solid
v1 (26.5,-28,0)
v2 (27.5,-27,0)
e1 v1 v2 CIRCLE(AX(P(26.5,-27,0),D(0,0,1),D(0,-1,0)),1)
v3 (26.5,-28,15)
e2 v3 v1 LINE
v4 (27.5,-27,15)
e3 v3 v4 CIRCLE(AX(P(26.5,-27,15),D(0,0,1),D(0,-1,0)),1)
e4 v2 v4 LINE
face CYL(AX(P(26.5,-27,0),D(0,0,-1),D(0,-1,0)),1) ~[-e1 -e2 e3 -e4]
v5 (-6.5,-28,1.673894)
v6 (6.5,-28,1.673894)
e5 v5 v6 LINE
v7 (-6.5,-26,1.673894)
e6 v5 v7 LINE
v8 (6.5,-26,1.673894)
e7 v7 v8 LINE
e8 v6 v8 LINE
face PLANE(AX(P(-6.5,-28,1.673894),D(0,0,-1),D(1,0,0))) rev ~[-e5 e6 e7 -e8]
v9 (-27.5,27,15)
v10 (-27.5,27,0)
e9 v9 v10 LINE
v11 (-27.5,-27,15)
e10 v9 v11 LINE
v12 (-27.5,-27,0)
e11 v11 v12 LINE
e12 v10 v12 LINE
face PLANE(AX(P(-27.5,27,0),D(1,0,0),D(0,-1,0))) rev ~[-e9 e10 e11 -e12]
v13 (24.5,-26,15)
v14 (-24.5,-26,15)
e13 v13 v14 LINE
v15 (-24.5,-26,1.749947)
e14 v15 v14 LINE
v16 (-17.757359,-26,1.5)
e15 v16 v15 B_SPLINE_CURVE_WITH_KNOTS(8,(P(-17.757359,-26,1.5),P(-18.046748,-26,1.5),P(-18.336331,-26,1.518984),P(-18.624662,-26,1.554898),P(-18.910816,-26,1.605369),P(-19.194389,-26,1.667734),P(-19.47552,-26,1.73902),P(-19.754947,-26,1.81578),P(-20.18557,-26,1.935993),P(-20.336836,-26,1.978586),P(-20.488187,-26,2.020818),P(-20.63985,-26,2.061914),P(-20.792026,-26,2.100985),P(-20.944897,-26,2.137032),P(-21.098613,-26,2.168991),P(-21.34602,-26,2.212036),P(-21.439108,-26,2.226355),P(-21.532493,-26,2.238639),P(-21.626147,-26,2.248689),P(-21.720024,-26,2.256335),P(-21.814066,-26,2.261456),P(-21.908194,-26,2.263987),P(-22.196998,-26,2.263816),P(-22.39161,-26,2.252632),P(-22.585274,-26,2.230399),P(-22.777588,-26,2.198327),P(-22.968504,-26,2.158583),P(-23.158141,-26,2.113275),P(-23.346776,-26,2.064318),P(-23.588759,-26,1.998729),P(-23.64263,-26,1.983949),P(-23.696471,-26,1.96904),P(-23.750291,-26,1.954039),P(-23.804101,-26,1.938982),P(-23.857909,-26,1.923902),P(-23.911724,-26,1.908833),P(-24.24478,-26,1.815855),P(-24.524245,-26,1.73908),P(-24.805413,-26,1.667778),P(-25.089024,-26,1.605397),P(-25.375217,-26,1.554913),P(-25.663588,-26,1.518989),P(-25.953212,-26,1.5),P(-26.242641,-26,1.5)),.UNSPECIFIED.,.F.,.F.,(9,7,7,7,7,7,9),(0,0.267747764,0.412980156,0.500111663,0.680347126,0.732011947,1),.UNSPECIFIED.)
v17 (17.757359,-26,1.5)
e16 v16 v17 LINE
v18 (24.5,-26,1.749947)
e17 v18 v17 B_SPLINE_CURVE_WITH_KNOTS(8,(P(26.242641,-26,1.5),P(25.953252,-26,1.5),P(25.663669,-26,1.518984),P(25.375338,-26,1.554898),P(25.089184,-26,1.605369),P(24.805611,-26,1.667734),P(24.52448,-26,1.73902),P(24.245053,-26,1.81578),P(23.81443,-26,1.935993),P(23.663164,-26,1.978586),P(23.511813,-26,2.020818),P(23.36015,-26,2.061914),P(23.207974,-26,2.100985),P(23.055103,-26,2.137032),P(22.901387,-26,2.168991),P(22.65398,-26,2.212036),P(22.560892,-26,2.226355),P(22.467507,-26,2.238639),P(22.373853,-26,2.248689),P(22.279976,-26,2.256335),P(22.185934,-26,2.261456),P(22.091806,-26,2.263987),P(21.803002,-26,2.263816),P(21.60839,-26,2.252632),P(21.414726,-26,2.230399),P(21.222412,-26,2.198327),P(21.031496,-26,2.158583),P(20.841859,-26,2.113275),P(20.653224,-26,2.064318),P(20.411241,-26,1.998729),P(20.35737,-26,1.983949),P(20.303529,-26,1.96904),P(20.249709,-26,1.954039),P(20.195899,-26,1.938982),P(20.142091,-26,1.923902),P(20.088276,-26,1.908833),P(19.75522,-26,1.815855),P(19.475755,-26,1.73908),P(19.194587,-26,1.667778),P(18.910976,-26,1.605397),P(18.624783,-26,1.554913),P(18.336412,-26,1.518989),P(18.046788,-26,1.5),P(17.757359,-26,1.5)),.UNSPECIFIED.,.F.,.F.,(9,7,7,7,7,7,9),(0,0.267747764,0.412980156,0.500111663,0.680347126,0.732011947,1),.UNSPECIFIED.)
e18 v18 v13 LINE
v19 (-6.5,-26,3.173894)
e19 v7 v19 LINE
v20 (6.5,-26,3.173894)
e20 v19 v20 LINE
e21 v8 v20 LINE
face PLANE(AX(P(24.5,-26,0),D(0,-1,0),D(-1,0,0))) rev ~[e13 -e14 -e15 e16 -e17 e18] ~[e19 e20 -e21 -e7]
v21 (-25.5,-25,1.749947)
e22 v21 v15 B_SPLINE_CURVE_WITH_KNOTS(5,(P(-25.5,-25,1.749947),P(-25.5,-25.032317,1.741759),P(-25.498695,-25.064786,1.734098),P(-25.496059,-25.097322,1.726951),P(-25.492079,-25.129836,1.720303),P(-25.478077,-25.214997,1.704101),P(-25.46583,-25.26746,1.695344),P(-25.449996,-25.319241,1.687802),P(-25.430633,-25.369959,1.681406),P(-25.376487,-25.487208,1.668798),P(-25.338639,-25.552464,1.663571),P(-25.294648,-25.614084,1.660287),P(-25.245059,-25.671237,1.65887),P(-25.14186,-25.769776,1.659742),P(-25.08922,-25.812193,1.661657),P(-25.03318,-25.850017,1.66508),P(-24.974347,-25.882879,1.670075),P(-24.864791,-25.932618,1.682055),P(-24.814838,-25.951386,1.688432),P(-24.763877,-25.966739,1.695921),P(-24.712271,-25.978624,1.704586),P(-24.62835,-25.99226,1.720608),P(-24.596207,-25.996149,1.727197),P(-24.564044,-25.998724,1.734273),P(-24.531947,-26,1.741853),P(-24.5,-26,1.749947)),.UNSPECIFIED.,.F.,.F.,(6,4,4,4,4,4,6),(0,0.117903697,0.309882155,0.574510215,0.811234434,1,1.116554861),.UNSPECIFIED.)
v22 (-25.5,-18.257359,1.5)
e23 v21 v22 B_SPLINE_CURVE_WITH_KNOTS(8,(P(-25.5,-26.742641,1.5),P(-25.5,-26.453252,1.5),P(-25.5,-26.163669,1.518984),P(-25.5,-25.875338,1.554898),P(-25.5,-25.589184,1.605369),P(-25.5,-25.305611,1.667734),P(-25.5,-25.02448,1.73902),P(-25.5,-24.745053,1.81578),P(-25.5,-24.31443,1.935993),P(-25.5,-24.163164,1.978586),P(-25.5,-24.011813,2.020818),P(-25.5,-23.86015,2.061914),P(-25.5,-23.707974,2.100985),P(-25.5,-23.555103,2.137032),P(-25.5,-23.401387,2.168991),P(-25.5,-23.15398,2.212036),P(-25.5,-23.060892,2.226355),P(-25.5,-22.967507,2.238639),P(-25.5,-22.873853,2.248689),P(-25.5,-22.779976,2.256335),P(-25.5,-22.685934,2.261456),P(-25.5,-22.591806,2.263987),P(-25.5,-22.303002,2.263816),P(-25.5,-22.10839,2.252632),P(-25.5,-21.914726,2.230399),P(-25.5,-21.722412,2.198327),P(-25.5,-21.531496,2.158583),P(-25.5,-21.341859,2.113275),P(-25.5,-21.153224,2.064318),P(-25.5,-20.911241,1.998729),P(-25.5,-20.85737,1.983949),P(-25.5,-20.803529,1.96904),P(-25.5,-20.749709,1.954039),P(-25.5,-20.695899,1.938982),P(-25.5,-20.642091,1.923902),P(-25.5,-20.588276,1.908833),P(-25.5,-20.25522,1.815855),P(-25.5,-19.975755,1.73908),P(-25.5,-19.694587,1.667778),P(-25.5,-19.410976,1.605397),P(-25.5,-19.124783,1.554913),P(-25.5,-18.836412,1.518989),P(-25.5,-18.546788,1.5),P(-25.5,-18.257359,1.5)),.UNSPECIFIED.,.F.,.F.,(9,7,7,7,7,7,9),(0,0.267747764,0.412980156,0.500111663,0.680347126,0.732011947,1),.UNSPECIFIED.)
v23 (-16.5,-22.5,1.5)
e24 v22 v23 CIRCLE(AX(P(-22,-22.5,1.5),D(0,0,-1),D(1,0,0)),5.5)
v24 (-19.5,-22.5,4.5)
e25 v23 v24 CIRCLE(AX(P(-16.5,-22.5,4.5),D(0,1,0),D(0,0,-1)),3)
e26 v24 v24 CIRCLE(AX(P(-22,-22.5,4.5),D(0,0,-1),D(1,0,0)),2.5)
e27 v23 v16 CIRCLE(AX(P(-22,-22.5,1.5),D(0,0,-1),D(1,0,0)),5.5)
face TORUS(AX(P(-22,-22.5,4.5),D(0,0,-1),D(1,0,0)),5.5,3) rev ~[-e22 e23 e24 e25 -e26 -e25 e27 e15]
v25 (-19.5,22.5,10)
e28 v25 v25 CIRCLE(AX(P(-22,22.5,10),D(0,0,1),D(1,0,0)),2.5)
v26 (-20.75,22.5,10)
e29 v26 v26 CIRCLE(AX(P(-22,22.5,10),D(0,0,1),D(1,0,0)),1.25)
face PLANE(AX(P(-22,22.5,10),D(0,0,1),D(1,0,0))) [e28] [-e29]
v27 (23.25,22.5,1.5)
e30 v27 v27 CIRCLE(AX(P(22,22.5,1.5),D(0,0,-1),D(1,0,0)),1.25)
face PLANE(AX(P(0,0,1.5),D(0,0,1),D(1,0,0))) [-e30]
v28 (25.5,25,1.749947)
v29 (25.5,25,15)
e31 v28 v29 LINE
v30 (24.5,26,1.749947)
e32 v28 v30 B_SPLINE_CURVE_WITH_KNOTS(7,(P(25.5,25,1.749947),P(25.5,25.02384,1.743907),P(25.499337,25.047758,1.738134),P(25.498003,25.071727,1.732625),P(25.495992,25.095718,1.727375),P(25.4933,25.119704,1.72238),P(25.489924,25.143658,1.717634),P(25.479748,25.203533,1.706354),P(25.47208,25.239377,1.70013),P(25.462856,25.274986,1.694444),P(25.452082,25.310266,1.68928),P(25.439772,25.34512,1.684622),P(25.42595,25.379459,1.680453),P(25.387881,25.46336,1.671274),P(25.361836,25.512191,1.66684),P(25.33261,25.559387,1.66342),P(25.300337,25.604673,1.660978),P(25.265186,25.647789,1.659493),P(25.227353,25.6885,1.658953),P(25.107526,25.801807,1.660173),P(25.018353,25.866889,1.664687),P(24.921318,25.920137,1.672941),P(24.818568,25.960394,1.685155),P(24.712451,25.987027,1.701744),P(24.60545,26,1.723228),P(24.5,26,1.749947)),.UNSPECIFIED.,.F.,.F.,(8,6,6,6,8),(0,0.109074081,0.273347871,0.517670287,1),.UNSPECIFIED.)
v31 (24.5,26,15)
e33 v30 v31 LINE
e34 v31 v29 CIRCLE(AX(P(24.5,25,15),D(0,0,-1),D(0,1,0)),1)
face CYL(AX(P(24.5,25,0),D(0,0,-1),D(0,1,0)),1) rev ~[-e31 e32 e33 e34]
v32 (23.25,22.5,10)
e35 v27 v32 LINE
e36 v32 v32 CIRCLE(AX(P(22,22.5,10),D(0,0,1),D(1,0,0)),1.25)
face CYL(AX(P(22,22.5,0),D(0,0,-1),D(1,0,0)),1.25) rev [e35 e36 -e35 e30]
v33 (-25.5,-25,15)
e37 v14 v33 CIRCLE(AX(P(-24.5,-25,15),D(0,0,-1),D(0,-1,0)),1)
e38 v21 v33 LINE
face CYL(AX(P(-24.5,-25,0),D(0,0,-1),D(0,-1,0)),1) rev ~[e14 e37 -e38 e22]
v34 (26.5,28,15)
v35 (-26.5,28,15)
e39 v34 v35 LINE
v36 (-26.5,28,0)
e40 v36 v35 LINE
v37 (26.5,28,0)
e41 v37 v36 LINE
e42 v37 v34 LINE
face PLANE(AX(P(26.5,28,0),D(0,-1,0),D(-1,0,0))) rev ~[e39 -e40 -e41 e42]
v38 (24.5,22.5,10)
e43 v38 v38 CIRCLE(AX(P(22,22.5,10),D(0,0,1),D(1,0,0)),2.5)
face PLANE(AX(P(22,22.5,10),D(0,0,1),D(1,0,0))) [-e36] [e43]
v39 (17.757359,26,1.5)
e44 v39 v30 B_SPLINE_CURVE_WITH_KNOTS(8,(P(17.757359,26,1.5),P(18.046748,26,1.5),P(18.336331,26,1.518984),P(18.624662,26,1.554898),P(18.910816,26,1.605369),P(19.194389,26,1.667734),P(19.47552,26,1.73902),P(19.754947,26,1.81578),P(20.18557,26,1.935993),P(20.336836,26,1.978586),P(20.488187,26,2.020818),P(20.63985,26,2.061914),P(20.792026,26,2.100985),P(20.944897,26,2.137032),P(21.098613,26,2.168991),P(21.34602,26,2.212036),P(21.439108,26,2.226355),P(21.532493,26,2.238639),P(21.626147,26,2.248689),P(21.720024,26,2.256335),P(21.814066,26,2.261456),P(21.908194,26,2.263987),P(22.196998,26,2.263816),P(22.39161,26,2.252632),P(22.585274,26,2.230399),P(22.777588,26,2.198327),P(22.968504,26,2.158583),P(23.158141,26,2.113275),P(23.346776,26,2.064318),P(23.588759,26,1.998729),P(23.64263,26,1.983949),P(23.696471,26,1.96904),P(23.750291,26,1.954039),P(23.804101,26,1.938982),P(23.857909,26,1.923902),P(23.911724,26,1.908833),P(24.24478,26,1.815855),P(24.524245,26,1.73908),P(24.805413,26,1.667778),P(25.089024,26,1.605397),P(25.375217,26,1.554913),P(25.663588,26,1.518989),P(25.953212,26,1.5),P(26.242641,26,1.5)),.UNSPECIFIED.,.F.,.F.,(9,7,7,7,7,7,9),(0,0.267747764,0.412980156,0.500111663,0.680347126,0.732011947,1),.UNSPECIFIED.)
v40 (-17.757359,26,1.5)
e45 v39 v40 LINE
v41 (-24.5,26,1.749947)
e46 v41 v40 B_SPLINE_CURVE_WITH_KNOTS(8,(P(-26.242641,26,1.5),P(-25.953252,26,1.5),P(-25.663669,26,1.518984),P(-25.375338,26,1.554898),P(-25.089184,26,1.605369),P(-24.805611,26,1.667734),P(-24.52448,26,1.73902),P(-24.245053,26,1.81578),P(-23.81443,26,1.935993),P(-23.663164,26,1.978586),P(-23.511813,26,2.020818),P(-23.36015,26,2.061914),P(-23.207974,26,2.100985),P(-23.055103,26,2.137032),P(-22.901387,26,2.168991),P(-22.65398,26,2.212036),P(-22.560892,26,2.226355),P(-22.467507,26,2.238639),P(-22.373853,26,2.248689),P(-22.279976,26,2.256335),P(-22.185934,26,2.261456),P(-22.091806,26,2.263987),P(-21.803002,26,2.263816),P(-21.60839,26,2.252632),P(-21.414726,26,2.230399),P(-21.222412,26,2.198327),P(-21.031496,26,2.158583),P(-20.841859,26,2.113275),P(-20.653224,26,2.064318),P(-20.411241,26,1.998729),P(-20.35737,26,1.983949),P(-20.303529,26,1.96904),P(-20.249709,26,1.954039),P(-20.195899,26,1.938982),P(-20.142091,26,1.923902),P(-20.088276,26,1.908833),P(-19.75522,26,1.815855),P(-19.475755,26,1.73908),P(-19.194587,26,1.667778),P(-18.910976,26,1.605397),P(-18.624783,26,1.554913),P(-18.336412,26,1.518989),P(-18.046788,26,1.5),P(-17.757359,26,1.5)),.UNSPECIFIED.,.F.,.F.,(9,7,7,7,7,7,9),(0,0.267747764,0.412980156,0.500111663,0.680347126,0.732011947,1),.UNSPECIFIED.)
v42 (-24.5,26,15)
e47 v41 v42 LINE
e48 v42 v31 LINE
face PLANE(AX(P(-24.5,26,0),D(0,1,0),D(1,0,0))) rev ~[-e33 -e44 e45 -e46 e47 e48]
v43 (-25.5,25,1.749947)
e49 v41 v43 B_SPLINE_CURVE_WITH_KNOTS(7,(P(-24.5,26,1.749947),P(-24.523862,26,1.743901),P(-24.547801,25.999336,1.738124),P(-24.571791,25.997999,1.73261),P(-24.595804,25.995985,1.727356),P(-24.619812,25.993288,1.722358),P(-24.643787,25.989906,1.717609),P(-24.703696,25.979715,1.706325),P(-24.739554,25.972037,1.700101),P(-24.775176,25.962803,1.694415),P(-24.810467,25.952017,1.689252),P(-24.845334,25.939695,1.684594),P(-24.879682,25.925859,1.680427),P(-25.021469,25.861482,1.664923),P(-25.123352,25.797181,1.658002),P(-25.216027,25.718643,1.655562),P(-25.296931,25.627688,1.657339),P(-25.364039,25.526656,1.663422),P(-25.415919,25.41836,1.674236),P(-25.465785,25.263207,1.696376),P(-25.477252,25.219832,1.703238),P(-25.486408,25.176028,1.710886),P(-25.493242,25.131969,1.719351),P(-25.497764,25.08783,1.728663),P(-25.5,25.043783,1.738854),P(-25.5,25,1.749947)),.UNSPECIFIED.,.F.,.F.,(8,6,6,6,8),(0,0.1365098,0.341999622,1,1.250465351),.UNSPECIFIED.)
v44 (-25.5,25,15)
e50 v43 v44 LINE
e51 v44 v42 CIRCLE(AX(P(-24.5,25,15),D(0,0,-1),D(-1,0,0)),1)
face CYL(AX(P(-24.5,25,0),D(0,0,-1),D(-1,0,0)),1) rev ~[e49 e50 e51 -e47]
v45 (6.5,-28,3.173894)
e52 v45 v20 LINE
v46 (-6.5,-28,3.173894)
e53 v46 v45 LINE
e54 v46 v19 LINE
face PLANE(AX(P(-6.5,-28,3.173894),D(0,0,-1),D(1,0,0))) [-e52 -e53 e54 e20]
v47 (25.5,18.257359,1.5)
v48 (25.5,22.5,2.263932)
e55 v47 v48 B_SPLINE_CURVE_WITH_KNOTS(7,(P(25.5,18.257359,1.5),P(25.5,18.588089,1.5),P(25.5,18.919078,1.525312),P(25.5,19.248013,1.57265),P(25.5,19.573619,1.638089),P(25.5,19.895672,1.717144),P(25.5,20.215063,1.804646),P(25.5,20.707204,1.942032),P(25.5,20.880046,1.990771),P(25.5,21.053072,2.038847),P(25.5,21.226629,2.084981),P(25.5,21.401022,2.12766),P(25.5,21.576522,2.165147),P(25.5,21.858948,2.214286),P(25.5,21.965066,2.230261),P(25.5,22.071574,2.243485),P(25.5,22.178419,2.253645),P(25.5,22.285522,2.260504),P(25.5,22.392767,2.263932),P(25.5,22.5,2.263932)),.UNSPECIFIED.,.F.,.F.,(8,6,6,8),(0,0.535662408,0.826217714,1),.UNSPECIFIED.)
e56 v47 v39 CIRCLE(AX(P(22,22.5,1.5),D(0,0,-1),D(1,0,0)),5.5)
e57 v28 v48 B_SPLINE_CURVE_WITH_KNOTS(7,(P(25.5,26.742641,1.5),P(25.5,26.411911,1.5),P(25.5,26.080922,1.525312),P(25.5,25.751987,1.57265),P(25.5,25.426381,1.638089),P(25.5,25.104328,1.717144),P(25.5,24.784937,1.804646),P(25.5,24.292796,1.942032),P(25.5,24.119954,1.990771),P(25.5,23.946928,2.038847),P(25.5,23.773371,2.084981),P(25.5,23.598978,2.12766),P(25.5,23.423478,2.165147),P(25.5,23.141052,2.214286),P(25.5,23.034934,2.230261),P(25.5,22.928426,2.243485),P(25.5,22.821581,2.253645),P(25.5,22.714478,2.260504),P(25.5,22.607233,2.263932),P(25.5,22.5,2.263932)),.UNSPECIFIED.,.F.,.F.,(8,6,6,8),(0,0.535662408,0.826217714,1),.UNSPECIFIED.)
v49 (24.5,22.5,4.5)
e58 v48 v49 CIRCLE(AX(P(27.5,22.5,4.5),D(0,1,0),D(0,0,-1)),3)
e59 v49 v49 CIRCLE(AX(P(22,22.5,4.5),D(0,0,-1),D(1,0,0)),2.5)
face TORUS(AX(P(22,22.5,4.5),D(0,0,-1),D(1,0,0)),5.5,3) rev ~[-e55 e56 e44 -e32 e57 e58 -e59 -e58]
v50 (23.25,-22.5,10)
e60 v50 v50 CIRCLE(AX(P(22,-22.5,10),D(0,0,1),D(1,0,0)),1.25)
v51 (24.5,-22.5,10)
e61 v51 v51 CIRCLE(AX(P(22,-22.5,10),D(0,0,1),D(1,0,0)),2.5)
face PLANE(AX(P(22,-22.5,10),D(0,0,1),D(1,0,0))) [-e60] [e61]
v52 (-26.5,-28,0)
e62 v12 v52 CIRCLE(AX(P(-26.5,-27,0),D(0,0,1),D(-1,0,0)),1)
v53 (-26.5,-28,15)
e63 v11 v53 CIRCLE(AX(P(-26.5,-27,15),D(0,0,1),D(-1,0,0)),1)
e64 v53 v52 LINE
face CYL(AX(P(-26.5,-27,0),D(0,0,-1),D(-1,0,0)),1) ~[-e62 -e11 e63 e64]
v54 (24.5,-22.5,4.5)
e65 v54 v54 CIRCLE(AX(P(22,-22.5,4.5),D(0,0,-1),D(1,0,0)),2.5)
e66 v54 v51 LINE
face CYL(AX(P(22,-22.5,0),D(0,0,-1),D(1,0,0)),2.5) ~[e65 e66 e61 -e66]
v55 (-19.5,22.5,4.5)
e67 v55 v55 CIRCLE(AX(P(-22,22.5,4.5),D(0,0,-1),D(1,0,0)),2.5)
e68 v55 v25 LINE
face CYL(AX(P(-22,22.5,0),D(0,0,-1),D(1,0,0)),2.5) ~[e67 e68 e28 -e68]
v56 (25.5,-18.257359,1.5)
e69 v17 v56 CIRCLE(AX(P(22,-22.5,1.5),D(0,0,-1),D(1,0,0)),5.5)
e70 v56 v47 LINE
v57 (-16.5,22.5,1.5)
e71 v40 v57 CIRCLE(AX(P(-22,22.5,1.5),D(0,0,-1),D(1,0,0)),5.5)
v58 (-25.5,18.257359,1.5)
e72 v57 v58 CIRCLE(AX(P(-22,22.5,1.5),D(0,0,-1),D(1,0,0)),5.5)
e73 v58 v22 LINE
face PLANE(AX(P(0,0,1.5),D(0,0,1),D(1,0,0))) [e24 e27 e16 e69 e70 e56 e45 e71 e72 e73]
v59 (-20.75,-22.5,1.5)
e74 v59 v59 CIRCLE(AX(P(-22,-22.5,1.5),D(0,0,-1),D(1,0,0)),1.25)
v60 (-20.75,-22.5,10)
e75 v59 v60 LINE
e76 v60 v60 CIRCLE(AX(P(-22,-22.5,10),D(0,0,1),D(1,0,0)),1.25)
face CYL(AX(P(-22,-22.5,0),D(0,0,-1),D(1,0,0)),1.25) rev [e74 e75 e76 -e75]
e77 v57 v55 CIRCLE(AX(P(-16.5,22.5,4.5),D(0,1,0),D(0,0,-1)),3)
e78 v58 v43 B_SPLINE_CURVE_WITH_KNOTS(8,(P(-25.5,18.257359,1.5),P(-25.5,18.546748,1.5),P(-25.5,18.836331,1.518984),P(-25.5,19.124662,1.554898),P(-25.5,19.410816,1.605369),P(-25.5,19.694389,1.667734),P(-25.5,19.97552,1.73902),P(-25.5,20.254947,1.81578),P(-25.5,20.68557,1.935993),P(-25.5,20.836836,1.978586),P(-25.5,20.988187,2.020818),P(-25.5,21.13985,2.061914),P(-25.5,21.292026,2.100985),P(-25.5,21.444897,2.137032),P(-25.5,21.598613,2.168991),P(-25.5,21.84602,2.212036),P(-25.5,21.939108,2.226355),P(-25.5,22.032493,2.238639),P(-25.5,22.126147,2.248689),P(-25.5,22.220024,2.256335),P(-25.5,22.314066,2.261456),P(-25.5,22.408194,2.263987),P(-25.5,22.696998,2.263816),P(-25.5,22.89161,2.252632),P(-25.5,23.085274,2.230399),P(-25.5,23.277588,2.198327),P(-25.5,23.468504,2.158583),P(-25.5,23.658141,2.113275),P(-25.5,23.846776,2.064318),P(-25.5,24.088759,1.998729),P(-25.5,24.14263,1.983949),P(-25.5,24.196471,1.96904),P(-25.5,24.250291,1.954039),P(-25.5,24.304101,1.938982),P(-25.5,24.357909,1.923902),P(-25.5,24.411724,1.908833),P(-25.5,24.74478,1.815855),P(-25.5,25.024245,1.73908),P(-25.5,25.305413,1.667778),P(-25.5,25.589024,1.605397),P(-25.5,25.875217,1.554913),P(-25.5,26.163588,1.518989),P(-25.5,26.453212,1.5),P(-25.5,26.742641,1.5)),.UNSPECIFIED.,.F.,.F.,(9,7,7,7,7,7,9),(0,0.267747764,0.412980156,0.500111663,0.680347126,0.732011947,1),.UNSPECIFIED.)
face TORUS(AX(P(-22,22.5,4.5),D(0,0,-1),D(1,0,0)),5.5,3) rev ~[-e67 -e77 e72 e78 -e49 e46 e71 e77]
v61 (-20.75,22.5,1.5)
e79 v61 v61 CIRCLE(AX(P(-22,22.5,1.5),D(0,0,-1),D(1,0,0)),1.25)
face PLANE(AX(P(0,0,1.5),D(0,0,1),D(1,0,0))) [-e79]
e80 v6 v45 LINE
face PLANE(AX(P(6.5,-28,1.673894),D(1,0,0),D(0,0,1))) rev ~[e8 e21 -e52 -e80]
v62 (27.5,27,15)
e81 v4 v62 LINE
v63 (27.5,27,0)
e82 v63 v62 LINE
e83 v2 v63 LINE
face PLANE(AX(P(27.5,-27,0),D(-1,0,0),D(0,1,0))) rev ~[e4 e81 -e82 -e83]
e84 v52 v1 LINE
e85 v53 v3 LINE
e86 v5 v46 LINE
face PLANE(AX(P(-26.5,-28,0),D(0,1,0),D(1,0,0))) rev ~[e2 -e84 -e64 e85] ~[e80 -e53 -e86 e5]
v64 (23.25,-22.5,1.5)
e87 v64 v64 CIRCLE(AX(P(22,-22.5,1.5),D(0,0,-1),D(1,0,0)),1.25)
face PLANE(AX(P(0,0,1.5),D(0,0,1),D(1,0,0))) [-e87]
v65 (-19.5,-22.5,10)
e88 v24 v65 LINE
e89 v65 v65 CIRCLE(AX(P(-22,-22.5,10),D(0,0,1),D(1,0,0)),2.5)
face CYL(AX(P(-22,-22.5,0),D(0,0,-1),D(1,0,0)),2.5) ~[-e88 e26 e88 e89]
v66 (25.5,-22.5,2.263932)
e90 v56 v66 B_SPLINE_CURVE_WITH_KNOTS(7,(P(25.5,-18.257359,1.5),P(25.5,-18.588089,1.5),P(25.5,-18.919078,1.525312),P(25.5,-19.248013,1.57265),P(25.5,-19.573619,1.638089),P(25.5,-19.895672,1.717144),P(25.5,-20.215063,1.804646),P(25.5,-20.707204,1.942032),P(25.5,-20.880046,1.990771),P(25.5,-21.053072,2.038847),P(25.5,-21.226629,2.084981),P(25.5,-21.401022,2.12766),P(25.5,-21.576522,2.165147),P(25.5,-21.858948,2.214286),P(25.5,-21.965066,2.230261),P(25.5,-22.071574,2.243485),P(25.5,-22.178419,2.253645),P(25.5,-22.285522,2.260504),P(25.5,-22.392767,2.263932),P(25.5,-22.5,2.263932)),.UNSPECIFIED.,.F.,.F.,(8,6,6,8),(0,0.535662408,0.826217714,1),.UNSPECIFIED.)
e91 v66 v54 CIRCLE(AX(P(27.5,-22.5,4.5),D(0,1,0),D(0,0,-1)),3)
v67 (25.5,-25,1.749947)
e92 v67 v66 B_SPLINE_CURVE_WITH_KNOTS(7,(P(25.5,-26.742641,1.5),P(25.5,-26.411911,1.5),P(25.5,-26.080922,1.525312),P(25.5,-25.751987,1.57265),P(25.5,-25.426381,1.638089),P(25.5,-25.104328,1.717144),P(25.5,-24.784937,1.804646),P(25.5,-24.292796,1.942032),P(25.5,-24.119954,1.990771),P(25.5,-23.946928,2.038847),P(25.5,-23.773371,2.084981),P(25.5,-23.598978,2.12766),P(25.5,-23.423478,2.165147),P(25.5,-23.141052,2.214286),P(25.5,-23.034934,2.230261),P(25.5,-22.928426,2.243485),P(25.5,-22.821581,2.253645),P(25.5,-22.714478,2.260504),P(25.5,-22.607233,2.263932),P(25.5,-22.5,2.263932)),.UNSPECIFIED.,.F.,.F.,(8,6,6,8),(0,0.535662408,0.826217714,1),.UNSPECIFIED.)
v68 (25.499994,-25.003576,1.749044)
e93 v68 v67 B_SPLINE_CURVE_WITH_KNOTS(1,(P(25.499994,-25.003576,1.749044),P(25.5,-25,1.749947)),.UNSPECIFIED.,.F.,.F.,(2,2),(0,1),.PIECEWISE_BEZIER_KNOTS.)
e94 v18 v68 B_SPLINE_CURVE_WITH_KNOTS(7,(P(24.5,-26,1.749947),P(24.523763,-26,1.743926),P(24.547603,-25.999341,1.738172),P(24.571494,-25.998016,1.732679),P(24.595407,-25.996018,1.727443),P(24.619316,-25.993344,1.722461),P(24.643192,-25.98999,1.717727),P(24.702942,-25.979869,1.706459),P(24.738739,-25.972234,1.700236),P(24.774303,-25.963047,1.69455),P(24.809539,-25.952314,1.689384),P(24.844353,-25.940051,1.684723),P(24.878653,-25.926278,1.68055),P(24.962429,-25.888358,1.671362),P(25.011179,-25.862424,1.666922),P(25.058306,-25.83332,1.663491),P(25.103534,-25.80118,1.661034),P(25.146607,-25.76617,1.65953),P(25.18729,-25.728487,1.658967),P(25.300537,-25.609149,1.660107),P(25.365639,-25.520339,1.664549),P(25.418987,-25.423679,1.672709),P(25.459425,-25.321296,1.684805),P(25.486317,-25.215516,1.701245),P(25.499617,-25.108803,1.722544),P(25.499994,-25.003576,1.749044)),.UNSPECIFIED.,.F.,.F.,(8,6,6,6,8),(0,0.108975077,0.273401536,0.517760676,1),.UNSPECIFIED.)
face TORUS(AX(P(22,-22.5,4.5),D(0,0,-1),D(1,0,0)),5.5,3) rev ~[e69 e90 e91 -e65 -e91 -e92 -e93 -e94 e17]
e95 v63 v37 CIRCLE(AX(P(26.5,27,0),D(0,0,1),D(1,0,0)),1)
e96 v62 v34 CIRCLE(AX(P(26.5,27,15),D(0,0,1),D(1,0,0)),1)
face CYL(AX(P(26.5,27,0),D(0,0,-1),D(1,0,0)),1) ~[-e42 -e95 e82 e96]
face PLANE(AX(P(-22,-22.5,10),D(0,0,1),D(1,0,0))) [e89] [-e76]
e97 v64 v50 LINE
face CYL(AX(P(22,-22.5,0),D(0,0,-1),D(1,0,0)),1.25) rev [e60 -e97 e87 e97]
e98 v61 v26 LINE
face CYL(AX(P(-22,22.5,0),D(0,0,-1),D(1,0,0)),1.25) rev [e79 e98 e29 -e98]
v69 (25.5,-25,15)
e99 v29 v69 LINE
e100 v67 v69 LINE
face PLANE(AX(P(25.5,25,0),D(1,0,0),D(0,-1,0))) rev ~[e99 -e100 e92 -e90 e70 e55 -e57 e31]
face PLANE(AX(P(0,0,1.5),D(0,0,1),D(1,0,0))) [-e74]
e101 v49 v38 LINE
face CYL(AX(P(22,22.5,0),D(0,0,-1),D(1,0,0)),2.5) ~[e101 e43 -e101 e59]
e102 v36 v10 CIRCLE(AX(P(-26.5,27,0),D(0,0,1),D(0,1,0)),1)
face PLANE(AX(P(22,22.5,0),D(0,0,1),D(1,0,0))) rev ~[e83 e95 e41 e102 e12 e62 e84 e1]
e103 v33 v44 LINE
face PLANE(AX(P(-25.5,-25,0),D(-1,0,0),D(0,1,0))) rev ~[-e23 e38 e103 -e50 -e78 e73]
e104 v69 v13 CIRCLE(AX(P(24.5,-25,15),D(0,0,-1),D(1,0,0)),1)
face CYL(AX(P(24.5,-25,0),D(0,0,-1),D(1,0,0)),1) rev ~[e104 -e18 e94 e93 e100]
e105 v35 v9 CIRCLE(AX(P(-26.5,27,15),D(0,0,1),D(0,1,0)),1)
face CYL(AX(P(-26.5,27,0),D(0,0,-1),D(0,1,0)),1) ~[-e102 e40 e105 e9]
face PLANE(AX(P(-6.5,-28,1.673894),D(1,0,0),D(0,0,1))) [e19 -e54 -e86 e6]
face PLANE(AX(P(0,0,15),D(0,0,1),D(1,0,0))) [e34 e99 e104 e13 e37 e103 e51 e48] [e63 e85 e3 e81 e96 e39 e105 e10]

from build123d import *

# Parameters (mm, degrees)
F0_R     = 2.5
F0_R_2   = 1.25
F1_DEPTH = 1.5
F2_DEPTH = 15
F3_DEPTH = 10
F5_W     = 13
F5_H     = 1.5
F6_DEPTH = 5


# Not quite as in the source:
# - a fillet or chamfer that OpenCascade refuses, or shapes differently, is made with other operations: its cross-section is extruded or revolved along the edge and cut away or added


with BuildPart() as f1:
    # F0 (on Top) → F1 (new body)
    with BuildSketch(Plane.XY):
        with BuildLine():
            ThreePointArc((26.5, -28), (27.2071067812, -27.7071067812), (27.5, -27))
            Line((27.5, -27), (27.5, 27))
            ThreePointArc((27.5, 27), (27.2071067812, 27.7071067812), (26.5, 28))
            Line((26.5, 28), (-26.5, 28))
            ThreePointArc((-26.5, 28), (-27.2071067812, 27.7071067812), (-27.5, 27))
            Line((-27.5, 27), (-27.5, -27))
            ThreePointArc((-27.5, -27), (-27.2071067812, -27.7071067812), (-26.5, -28))
            Line((-26.5, -28), (26.5, -28))
        make_face()
        with BuildLine():
            ThreePointArc((25.5, -25), (25.2071067812, -25.7071067812), (24.5, -26))
            Line((24.5, -26), (-24.5, -26))
            ThreePointArc((-24.5, -26), (-25.2071067812, -25.7071067812), (-25.5, -25))
            Line((-25.5, -25), (-25.5, 25))
            ThreePointArc((-25.5, 25), (-25.2071067812, 25.7071067812), (-24.5, 26))
            Line((-24.5, 26), (24.5, 26))
            ThreePointArc((24.5, 26), (25.2071067812, 25.7071067812), (25.5, 25))
            Line((25.5, 25), (25.5, -25))
        make_face(mode=Mode.SUBTRACT)
        with BuildLine():
            Line((-24.5, -26), (24.5, -26))
            ThreePointArc((24.5, -26), (25.2071067812, -25.7071067812), (25.5, -25))
            Line((25.5, -25), (25.5, 25))
            ThreePointArc((25.5, 25), (25.2071067812, 25.7071067812), (24.5, 26))
            Line((24.5, 26), (-24.5, 26))
            ThreePointArc((-24.5, 26), (-25.2071067812, 25.7071067812), (-25.5, 25))
            Line((-25.5, 25), (-25.5, -25))
            ThreePointArc((-25.5, -25), (-25.2071067812, -25.7071067812), (-24.5, -26))
        make_face()
        with Locations((-22, -22.5)):
            Circle(F0_R, mode=Mode.SUBTRACT)
        with Locations((22, -22.5)):
            Circle(F0_R, mode=Mode.SUBTRACT)
        with Locations((-22, 22.5)):
            Circle(F0_R, mode=Mode.SUBTRACT)
        with Locations((22, 22.5)):
            Circle(F0_R, mode=Mode.SUBTRACT)
        with Locations((-22, -22.5)):
            Circle(F0_R)
        with Locations((-22, -22.5)):
            Circle(F0_R_2, mode=Mode.SUBTRACT)
        with Locations((22, -22.5)):
            Circle(F0_R)
        with Locations((22, -22.5)):
            Circle(F0_R_2, mode=Mode.SUBTRACT)
        with Locations((22, 22.5)):
            Circle(F0_R)
        with Locations((22, 22.5)):
            Circle(F0_R_2, mode=Mode.SUBTRACT)
        with Locations((-22, 22.5)):
            Circle(F0_R)
        with Locations((-22, 22.5)):
            Circle(F0_R_2, mode=Mode.SUBTRACT)
        with Locations((-22, -22.5)):
            Circle(F0_R_2)
        with Locations((22, -22.5)):
            Circle(F0_R_2)
        with Locations((22, 22.5)):
            Circle(F0_R_2)
        with Locations((-22, 22.5)):
            Circle(F0_R_2)
    extrude(amount=F1_DEPTH)

    # F0 (on Top) → F2 (join)
    with BuildSketch(Plane.XY):
        with BuildLine():
            ThreePointArc((26.5, -28), (27.2071067812, -27.7071067812), (27.5, -27))
            Line((27.5, -27), (27.5, 27))
            ThreePointArc((27.5, 27), (27.2071067812, 27.7071067812), (26.5, 28))
            Line((26.5, 28), (-26.5, 28))
            ThreePointArc((-26.5, 28), (-27.2071067812, 27.7071067812), (-27.5, 27))
            Line((-27.5, 27), (-27.5, -27))
            ThreePointArc((-27.5, -27), (-27.2071067812, -27.7071067812), (-26.5, -28))
            Line((-26.5, -28), (26.5, -28))
        make_face()
        with BuildLine():
            ThreePointArc((25.5, -25), (25.2071067812, -25.7071067812), (24.5, -26))
            Line((24.5, -26), (-24.5, -26))
            ThreePointArc((-24.5, -26), (-25.2071067812, -25.7071067812), (-25.5, -25))
            Line((-25.5, -25), (-25.5, 25))
            ThreePointArc((-25.5, 25), (-25.2071067812, 25.7071067812), (-24.5, 26))
            Line((-24.5, 26), (24.5, 26))
            ThreePointArc((24.5, 26), (25.2071067812, 25.7071067812), (25.5, 25))
            Line((25.5, 25), (25.5, -25))
        make_face(mode=Mode.SUBTRACT)
    extrude(amount=F2_DEPTH)

    # F0 (on Top) → F3 (join)
    with BuildSketch(Plane.XY):
        with Locations((22, 22.5)):
            Circle(F0_R)
        with Locations((22, 22.5)):
            Circle(F0_R_2, mode=Mode.SUBTRACT)
        with Locations((-22, 22.5)):
            Circle(F0_R)
        with Locations((-22, 22.5)):
            Circle(F0_R_2, mode=Mode.SUBTRACT)
        with Locations((-22, -22.5)):
            Circle(F0_R)
        with Locations((-22, -22.5)):
            Circle(F0_R_2, mode=Mode.SUBTRACT)
        with Locations((22, -22.5)):
            Circle(F0_R)
        with Locations((22, -22.5)):
            Circle(F0_R_2, mode=Mode.SUBTRACT)
    extrude(amount=F3_DEPTH)

    # F4: fillet of radius 3 on 4 edges, made by hand

    # F4_s1 → F4_t2 (revolve)
    with BuildSketch(Plane.XZ.offset(22.5)):
        with BuildLine():
            ThreePointArc((27.5, 1.5), (25.3786796564, 2.3786796564), (24.5, 4.5))
            Line((24.5, 4.5), (24.5, 1.5))
            Line((24.5, 1.5), (27.5, 1.5))
        make_face()
    revolve(axis=Axis((22, -22.5, 1.5), (0, 0, -1)))

    # F4_s3 → F4_t4 (revolve)
    with BuildSketch(Plane.XZ.offset(-22.5)):
        with BuildLine():
            ThreePointArc((-16.5, 1.5), (-18.6213203436, 2.3786796564), (-19.5, 4.5))
            Line((-19.5, 4.5), (-19.5, 1.5))
            Line((-19.5, 1.5), (-16.5, 1.5))
        make_face()
    revolve(axis=Axis((-22, 22.5, 1.5), (0, 0, -1)))

    # F4_s5 → F4_t6 (revolve)
    with BuildSketch(Plane.XZ.offset(22.5)):
        with BuildLine():
            ThreePointArc((-16.5, 1.5), (-18.6213203436, 2.3786796564), (-19.5, 4.5))
            Line((-19.5, 4.5), (-19.5, 1.5))
            Line((-19.5, 1.5), (-16.5, 1.5))
        make_face()
    revolve(axis=Axis((-22, -22.5, 1.5), (0, 0, -1)))

    # F4_s7 → F4_t8 (revolve)
    with BuildSketch(Plane.XZ.offset(-22.5)):
        with BuildLine():
            ThreePointArc((27.5, 1.5), (25.3786796564, 2.3786796564), (24.5, 4.5))
            Line((24.5, 4.5), (24.5, 1.5))
            Line((24.5, 1.5), (27.5, 1.5))
        make_face()
    revolve(axis=Axis((22, 22.5, 1.5), (0, 0, -1)))

    # F5 (on face) → F6 (cut)
    with BuildSketch(Plane.XZ.offset(28)):
        with Locations((0, 2.4238943588)):
            Rectangle(F5_W, F5_H)
    extrude(amount=-F6_DEPTH, mode=Mode.SUBTRACT)


solid = f1.part
